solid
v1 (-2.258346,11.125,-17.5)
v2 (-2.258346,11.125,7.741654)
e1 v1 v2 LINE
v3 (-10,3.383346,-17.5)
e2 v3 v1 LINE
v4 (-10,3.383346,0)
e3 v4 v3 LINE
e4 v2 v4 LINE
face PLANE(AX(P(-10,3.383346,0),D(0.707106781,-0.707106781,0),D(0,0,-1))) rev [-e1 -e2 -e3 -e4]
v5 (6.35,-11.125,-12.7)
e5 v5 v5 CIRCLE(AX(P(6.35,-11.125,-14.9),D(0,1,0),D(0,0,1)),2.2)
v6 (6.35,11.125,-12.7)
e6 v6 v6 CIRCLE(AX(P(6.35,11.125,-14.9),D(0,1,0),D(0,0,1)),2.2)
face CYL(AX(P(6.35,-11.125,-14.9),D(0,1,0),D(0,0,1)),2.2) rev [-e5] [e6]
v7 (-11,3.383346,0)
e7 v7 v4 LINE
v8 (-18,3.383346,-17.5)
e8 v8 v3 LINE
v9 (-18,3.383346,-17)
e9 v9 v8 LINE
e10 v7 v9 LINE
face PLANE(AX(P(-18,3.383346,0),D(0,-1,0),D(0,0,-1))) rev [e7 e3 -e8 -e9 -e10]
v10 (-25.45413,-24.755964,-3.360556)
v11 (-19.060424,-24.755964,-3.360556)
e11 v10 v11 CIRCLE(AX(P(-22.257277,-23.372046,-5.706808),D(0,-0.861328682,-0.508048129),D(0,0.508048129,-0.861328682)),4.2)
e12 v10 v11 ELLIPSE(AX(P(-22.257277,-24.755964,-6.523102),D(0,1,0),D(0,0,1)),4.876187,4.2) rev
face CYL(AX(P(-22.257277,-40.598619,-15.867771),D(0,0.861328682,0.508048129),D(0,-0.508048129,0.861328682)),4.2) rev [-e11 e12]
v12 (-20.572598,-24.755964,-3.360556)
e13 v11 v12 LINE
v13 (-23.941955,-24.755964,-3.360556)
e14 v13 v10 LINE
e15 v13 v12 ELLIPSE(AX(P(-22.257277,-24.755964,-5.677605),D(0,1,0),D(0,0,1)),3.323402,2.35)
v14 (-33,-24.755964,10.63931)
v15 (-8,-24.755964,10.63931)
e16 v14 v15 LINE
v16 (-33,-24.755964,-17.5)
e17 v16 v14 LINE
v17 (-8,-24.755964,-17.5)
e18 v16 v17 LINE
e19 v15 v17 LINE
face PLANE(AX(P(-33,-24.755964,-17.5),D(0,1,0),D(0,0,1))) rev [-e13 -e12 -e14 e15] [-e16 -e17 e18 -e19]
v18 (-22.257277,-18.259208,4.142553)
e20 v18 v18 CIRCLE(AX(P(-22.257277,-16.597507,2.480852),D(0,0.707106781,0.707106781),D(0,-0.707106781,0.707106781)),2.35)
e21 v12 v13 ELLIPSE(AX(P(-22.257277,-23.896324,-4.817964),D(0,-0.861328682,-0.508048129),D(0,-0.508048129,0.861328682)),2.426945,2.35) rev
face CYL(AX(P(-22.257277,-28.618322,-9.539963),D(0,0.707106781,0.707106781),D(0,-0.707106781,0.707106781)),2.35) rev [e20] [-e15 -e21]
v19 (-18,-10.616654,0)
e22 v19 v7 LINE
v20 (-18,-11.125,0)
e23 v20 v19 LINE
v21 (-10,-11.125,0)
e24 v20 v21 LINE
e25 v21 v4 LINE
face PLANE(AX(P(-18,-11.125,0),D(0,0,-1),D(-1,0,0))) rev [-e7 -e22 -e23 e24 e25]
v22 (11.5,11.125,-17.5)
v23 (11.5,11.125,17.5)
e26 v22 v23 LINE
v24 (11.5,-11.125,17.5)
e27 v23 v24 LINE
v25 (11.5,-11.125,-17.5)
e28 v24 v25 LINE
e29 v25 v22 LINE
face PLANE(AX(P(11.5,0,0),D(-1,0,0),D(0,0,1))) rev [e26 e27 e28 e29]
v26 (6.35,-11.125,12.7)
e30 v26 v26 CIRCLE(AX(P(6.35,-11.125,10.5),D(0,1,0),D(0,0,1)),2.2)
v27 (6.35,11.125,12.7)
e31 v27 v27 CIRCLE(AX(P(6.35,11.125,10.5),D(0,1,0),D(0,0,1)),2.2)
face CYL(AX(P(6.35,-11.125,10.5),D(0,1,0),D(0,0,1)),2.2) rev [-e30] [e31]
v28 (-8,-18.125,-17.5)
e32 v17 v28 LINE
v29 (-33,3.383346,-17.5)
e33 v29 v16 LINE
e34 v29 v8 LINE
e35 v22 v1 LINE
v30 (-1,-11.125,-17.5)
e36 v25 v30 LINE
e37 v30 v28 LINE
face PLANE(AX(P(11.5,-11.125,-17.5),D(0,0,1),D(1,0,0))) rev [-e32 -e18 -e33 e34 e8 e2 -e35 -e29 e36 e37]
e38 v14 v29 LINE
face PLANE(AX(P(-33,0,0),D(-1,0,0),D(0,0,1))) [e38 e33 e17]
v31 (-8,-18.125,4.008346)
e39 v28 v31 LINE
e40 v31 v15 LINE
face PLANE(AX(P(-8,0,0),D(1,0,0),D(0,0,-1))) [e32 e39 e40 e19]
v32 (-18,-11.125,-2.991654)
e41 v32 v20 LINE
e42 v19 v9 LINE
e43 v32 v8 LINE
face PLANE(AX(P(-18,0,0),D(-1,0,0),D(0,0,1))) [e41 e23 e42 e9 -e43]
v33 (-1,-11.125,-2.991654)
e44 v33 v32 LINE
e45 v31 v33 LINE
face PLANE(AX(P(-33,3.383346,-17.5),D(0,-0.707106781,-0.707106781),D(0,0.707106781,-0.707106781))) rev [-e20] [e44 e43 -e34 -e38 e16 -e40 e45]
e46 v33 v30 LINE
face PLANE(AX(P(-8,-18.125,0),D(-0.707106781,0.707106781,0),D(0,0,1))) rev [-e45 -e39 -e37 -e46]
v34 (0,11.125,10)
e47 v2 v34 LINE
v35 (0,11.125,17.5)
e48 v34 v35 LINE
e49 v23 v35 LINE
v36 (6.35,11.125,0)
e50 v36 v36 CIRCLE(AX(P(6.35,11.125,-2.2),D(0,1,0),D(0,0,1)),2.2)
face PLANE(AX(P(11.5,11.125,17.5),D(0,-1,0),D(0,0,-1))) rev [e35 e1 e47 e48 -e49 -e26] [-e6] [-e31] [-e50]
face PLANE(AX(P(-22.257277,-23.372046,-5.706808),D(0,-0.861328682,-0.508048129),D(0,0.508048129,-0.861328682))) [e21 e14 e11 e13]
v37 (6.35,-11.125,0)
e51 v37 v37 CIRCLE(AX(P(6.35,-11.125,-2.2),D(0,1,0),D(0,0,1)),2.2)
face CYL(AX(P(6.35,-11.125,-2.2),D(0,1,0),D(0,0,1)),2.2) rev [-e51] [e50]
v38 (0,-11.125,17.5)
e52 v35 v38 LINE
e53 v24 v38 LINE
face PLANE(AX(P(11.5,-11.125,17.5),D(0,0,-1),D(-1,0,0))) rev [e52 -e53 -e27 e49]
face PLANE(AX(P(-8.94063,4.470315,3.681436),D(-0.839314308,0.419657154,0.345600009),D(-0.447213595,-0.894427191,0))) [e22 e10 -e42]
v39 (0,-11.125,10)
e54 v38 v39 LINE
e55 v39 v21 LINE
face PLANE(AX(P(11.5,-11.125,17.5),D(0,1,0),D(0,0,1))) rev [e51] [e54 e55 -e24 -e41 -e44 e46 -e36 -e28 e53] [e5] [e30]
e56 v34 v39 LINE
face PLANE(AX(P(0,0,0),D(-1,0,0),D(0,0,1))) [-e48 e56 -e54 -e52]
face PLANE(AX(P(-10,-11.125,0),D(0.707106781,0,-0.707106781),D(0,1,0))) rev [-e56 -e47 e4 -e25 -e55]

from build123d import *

# Parameters (mm, degrees)
SKETCH1_W               = 35
SKETCH1_H               = 22.25
BOSS_EXTRUDE1_DEPTH     = 11.5
SKETCH2_R               = 2.2
CUT_EXTRUDE1_DEPTH      = 31.554255023
LPATTERN1_COUNT         = 3
LPATTERN1_PITCH         = 12.7
SKETCH3_W               = 17.5
SKETCH3_H               = 14.50834553
BOSS_EXTRUDE2_DEPTH     = 18
CHAMFER1_SIZE           = 10
BOSS_EXTRUDE3_DEPTH     = 15
BOSS_EXTRUDE4_DEPTH     = 10
CHAMFER2_SIZE           = 7
SKETCH10_R              = 2.35
CUT_EXTRUDE6_DEPTH      = 17
CUT_EXTRUDE7_DEPTH      = 16
CUT_EXTRUDE7_DEPTH_BACK = 4
SKETCH12_R              = 4.2
CHAMFER3_START          = -7.072243188
CHAMFER3_DEPTH          = 22.731839604


with BuildPart() as part:
    # Sketch1 → Boss-Extrude1 (new body)
    with BuildSketch(Plane(origin=(0, 0, 0), x_dir=(0, 0, -1), z_dir=(1, 0, 0))):
        Rectangle(SKETCH1_W, SKETCH1_H)
    extrude(amount=BOSS_EXTRUDE1_DEPTH)

    # Sketch2 → Cut-Extrude1 (cut, through all)
    with BuildSketch(Plane(origin=(0, 11.125, 0), x_dir=(1, 0, 0), z_dir=(0, 1, 0))):
        with Locations(Location((6.35, -10.5, 0), (0, 0, 270))):
            Circle(SKETCH2_R)
    cut_extrude1 = extrude(amount=-CUT_EXTRUDE1_DEPTH, mode=Mode.SUBTRACT)

    # LPattern1: Cut-Extrude1 ×3
    with Locations(*[(0, 0, -i * LPATTERN1_PITCH) for i in range(1, LPATTERN1_COUNT)]):
        add(cut_extrude1, mode=Mode.SUBTRACT)

    # Sketch3 → Boss-Extrude2 (add)
    with BuildSketch(Plane.ZY):
        with Locations((-8.75, -3.870827235)):
            Rectangle(SKETCH3_W, SKETCH3_H)
    extrude(amount=BOSS_EXTRUDE2_DEPTH)

    # Chamfer1
    # the kernel refuses this chamfer: 10 mm, written as the material it adds along each edge
    with BuildSketch(Plane(origin=(0, 3.38334553, 0), x_dir=(0, 0, 1), z_dir=(0, -1, 0))) as chamfer1_piece_1:
        Polygon((CHAMFER1_SIZE, 0), (0, CHAMFER1_SIZE), (0, 0), align=None)
    extrude(amount=14.50834553)
    with BuildSketch(Plane(origin=(0, 3.38334553, -17.5), x_dir=(0, 1, 0), z_dir=(0, 0, 1))) as chamfer1_piece_2_section:
        Polygon((CHAMFER1_SIZE, 0), (0, CHAMFER1_SIZE), (0, 0), align=None)
    chamfer1_piece_2 = extrude(amount=17.5, mode=Mode.PRIVATE)
    chamfer1_piece_2 = split(chamfer1_piece_2, bisect_by=Plane(origin=(0, 11.125, -17.5), z_dir=(0, -1, 0)), keep=Keep.TOP, mode=Mode.PRIVATE)
    add(chamfer1_piece_2)
    with BuildSketch(Plane(origin=(0, 3.38334553, -17.5), x_dir=(0, 1, 0), z_dir=(0, 0, 1))) as chamfer1_piece_3a_section:
        Polygon((CHAMFER1_SIZE, 0), (0, CHAMFER1_SIZE), (0, 0), align=None)
    chamfer1_piece_3a = extrude(amount=43.21682988, mode=Mode.PRIVATE)
    chamfer1_piece_3a = split(chamfer1_piece_3a, bisect_by=Plane(origin=(0, 11.125, -17.5), z_dir=(0, -1, 0)), keep=Keep.TOP, mode=Mode.PRIVATE)
    chamfer1_piece_3a = split(chamfer1_piece_3a, bisect_by=Plane(origin=(0, 3.38334553, 17.5), z_dir=(0, 0, -1)), keep=Keep.TOP, mode=Mode.PRIVATE)
    chamfer1_piece_3a = split(chamfer1_piece_3a, bisect_by=Plane(origin=(0, 3.38334553, 0), z_dir=(0, 0, 1)), keep=Keep.TOP, mode=Mode.PRIVATE)
    with BuildSketch(Plane(origin=(0, 29.100175409, 0), x_dir=(0, 0, 1), z_dir=(0, -1, 0))) as chamfer1_piece_3b_section:
        Polygon((CHAMFER1_SIZE, 0), (0, CHAMFER1_SIZE), (0, 0), align=None)
    chamfer1_piece_3b = extrude(amount=40.225175409, mode=Mode.PRIVATE)
    chamfer1_piece_3b = split(chamfer1_piece_3b, bisect_by=Plane(origin=(0, 11.125, 0), z_dir=(0, -1, 0)), keep=Keep.TOP, mode=Mode.PRIVATE)
    chamfer1_piece_3b = split(chamfer1_piece_3b, bisect_by=Plane(origin=(0, 3.38334553, 0), z_dir=(0, 1, 0)), keep=Keep.TOP, mode=Mode.PRIVATE)
    chamfer1_piece_3 = chamfer1_piece_3a & chamfer1_piece_3b
    add(chamfer1_piece_3)

    # Sketch4 → Boss-Extrude3 (add)
    with BuildSketch(Plane.ZY.offset(18)):
        Polygon((-17.5, -11.125), (-17.5, 3.38334553), (10.639309948, -24.755964418), (-17.5, -24.755964418), (-17.5, -19.755964418), align=None)
    extrude(amount=BOSS_EXTRUDE3_DEPTH)

    # Sketch6 → Boss-Extrude4 (add)
    with BuildSketch(Plane(origin=(-18, 0, 0), x_dir=(0, 0, -1), z_dir=(1, 0, 0))):
        Polygon((17.5, -11.125), (17.5, -24.755964418), (-10.639309948, -24.755964418), (2.99165447, -11.125), align=None)
    extrude(amount=BOSS_EXTRUDE4_DEPTH)

    # Chamfer2
    chamfer2_edges = [part.edges().sort_by_distance(p)[0] for p in [
        (-8, -11.125, -10.245827235),
    ]]
    chamfer(chamfer2_edges, length=CHAMFER2_SIZE)

    # Sketch10 → Cut-Extrude6 (cut)
    with BuildSketch(Plane(origin=(0, -7.058327235, -7.058327235), x_dir=(1, 0, 0), z_dir=(0, 0.7071067811865477, 0.7071067811865475))):
        with Locations(Location((-22.257276658, -13.490437262, 0), (0, 0, 270))):
            Circle(SKETCH10_R)
    extrude(amount=-CUT_EXTRUDE6_DEPTH, mode=Mode.SUBTRACT)

    # Sketch12 → Cut-Extrude7 (cut, two sides: drawn at the far end of the back side and taken through both)
    with BuildSketch(Plane(origin=(0, -23.282012782, -13.732717015), x_dir=(-1, 0, 0), z_dir=(0, -0.8613286818189869, -0.5080481294877154)).offset(-CUT_EXTRUDE7_DEPTH_BACK)):
        with Locations((22.257276658, -6.958686238)):
            Circle(SKETCH12_R)
    extrude(amount=CUT_EXTRUDE7_DEPTH + CUT_EXTRUDE7_DEPTH_BACK, mode=Mode.SUBTRACT)

    # Chamfer3: read off the stored shape, not the designer's step
    # Chamfer3 outline → Chamfer3 (cut)
    with BuildSketch(Plane(origin=(0, 0, 0), x_dir=(1, 0, 0), z_dir=(0, 0.6357072528610996, -0.7719302356170498)).offset(CHAMFER3_START)):
        Polygon((-11, -2.611706712), (-18, 8.195316587), (-18, -4), (-10.100765054, -4), align=None)
    extrude(amount=CHAMFER3_DEPTH, mode=Mode.SUBTRACT)


solid = part.part
